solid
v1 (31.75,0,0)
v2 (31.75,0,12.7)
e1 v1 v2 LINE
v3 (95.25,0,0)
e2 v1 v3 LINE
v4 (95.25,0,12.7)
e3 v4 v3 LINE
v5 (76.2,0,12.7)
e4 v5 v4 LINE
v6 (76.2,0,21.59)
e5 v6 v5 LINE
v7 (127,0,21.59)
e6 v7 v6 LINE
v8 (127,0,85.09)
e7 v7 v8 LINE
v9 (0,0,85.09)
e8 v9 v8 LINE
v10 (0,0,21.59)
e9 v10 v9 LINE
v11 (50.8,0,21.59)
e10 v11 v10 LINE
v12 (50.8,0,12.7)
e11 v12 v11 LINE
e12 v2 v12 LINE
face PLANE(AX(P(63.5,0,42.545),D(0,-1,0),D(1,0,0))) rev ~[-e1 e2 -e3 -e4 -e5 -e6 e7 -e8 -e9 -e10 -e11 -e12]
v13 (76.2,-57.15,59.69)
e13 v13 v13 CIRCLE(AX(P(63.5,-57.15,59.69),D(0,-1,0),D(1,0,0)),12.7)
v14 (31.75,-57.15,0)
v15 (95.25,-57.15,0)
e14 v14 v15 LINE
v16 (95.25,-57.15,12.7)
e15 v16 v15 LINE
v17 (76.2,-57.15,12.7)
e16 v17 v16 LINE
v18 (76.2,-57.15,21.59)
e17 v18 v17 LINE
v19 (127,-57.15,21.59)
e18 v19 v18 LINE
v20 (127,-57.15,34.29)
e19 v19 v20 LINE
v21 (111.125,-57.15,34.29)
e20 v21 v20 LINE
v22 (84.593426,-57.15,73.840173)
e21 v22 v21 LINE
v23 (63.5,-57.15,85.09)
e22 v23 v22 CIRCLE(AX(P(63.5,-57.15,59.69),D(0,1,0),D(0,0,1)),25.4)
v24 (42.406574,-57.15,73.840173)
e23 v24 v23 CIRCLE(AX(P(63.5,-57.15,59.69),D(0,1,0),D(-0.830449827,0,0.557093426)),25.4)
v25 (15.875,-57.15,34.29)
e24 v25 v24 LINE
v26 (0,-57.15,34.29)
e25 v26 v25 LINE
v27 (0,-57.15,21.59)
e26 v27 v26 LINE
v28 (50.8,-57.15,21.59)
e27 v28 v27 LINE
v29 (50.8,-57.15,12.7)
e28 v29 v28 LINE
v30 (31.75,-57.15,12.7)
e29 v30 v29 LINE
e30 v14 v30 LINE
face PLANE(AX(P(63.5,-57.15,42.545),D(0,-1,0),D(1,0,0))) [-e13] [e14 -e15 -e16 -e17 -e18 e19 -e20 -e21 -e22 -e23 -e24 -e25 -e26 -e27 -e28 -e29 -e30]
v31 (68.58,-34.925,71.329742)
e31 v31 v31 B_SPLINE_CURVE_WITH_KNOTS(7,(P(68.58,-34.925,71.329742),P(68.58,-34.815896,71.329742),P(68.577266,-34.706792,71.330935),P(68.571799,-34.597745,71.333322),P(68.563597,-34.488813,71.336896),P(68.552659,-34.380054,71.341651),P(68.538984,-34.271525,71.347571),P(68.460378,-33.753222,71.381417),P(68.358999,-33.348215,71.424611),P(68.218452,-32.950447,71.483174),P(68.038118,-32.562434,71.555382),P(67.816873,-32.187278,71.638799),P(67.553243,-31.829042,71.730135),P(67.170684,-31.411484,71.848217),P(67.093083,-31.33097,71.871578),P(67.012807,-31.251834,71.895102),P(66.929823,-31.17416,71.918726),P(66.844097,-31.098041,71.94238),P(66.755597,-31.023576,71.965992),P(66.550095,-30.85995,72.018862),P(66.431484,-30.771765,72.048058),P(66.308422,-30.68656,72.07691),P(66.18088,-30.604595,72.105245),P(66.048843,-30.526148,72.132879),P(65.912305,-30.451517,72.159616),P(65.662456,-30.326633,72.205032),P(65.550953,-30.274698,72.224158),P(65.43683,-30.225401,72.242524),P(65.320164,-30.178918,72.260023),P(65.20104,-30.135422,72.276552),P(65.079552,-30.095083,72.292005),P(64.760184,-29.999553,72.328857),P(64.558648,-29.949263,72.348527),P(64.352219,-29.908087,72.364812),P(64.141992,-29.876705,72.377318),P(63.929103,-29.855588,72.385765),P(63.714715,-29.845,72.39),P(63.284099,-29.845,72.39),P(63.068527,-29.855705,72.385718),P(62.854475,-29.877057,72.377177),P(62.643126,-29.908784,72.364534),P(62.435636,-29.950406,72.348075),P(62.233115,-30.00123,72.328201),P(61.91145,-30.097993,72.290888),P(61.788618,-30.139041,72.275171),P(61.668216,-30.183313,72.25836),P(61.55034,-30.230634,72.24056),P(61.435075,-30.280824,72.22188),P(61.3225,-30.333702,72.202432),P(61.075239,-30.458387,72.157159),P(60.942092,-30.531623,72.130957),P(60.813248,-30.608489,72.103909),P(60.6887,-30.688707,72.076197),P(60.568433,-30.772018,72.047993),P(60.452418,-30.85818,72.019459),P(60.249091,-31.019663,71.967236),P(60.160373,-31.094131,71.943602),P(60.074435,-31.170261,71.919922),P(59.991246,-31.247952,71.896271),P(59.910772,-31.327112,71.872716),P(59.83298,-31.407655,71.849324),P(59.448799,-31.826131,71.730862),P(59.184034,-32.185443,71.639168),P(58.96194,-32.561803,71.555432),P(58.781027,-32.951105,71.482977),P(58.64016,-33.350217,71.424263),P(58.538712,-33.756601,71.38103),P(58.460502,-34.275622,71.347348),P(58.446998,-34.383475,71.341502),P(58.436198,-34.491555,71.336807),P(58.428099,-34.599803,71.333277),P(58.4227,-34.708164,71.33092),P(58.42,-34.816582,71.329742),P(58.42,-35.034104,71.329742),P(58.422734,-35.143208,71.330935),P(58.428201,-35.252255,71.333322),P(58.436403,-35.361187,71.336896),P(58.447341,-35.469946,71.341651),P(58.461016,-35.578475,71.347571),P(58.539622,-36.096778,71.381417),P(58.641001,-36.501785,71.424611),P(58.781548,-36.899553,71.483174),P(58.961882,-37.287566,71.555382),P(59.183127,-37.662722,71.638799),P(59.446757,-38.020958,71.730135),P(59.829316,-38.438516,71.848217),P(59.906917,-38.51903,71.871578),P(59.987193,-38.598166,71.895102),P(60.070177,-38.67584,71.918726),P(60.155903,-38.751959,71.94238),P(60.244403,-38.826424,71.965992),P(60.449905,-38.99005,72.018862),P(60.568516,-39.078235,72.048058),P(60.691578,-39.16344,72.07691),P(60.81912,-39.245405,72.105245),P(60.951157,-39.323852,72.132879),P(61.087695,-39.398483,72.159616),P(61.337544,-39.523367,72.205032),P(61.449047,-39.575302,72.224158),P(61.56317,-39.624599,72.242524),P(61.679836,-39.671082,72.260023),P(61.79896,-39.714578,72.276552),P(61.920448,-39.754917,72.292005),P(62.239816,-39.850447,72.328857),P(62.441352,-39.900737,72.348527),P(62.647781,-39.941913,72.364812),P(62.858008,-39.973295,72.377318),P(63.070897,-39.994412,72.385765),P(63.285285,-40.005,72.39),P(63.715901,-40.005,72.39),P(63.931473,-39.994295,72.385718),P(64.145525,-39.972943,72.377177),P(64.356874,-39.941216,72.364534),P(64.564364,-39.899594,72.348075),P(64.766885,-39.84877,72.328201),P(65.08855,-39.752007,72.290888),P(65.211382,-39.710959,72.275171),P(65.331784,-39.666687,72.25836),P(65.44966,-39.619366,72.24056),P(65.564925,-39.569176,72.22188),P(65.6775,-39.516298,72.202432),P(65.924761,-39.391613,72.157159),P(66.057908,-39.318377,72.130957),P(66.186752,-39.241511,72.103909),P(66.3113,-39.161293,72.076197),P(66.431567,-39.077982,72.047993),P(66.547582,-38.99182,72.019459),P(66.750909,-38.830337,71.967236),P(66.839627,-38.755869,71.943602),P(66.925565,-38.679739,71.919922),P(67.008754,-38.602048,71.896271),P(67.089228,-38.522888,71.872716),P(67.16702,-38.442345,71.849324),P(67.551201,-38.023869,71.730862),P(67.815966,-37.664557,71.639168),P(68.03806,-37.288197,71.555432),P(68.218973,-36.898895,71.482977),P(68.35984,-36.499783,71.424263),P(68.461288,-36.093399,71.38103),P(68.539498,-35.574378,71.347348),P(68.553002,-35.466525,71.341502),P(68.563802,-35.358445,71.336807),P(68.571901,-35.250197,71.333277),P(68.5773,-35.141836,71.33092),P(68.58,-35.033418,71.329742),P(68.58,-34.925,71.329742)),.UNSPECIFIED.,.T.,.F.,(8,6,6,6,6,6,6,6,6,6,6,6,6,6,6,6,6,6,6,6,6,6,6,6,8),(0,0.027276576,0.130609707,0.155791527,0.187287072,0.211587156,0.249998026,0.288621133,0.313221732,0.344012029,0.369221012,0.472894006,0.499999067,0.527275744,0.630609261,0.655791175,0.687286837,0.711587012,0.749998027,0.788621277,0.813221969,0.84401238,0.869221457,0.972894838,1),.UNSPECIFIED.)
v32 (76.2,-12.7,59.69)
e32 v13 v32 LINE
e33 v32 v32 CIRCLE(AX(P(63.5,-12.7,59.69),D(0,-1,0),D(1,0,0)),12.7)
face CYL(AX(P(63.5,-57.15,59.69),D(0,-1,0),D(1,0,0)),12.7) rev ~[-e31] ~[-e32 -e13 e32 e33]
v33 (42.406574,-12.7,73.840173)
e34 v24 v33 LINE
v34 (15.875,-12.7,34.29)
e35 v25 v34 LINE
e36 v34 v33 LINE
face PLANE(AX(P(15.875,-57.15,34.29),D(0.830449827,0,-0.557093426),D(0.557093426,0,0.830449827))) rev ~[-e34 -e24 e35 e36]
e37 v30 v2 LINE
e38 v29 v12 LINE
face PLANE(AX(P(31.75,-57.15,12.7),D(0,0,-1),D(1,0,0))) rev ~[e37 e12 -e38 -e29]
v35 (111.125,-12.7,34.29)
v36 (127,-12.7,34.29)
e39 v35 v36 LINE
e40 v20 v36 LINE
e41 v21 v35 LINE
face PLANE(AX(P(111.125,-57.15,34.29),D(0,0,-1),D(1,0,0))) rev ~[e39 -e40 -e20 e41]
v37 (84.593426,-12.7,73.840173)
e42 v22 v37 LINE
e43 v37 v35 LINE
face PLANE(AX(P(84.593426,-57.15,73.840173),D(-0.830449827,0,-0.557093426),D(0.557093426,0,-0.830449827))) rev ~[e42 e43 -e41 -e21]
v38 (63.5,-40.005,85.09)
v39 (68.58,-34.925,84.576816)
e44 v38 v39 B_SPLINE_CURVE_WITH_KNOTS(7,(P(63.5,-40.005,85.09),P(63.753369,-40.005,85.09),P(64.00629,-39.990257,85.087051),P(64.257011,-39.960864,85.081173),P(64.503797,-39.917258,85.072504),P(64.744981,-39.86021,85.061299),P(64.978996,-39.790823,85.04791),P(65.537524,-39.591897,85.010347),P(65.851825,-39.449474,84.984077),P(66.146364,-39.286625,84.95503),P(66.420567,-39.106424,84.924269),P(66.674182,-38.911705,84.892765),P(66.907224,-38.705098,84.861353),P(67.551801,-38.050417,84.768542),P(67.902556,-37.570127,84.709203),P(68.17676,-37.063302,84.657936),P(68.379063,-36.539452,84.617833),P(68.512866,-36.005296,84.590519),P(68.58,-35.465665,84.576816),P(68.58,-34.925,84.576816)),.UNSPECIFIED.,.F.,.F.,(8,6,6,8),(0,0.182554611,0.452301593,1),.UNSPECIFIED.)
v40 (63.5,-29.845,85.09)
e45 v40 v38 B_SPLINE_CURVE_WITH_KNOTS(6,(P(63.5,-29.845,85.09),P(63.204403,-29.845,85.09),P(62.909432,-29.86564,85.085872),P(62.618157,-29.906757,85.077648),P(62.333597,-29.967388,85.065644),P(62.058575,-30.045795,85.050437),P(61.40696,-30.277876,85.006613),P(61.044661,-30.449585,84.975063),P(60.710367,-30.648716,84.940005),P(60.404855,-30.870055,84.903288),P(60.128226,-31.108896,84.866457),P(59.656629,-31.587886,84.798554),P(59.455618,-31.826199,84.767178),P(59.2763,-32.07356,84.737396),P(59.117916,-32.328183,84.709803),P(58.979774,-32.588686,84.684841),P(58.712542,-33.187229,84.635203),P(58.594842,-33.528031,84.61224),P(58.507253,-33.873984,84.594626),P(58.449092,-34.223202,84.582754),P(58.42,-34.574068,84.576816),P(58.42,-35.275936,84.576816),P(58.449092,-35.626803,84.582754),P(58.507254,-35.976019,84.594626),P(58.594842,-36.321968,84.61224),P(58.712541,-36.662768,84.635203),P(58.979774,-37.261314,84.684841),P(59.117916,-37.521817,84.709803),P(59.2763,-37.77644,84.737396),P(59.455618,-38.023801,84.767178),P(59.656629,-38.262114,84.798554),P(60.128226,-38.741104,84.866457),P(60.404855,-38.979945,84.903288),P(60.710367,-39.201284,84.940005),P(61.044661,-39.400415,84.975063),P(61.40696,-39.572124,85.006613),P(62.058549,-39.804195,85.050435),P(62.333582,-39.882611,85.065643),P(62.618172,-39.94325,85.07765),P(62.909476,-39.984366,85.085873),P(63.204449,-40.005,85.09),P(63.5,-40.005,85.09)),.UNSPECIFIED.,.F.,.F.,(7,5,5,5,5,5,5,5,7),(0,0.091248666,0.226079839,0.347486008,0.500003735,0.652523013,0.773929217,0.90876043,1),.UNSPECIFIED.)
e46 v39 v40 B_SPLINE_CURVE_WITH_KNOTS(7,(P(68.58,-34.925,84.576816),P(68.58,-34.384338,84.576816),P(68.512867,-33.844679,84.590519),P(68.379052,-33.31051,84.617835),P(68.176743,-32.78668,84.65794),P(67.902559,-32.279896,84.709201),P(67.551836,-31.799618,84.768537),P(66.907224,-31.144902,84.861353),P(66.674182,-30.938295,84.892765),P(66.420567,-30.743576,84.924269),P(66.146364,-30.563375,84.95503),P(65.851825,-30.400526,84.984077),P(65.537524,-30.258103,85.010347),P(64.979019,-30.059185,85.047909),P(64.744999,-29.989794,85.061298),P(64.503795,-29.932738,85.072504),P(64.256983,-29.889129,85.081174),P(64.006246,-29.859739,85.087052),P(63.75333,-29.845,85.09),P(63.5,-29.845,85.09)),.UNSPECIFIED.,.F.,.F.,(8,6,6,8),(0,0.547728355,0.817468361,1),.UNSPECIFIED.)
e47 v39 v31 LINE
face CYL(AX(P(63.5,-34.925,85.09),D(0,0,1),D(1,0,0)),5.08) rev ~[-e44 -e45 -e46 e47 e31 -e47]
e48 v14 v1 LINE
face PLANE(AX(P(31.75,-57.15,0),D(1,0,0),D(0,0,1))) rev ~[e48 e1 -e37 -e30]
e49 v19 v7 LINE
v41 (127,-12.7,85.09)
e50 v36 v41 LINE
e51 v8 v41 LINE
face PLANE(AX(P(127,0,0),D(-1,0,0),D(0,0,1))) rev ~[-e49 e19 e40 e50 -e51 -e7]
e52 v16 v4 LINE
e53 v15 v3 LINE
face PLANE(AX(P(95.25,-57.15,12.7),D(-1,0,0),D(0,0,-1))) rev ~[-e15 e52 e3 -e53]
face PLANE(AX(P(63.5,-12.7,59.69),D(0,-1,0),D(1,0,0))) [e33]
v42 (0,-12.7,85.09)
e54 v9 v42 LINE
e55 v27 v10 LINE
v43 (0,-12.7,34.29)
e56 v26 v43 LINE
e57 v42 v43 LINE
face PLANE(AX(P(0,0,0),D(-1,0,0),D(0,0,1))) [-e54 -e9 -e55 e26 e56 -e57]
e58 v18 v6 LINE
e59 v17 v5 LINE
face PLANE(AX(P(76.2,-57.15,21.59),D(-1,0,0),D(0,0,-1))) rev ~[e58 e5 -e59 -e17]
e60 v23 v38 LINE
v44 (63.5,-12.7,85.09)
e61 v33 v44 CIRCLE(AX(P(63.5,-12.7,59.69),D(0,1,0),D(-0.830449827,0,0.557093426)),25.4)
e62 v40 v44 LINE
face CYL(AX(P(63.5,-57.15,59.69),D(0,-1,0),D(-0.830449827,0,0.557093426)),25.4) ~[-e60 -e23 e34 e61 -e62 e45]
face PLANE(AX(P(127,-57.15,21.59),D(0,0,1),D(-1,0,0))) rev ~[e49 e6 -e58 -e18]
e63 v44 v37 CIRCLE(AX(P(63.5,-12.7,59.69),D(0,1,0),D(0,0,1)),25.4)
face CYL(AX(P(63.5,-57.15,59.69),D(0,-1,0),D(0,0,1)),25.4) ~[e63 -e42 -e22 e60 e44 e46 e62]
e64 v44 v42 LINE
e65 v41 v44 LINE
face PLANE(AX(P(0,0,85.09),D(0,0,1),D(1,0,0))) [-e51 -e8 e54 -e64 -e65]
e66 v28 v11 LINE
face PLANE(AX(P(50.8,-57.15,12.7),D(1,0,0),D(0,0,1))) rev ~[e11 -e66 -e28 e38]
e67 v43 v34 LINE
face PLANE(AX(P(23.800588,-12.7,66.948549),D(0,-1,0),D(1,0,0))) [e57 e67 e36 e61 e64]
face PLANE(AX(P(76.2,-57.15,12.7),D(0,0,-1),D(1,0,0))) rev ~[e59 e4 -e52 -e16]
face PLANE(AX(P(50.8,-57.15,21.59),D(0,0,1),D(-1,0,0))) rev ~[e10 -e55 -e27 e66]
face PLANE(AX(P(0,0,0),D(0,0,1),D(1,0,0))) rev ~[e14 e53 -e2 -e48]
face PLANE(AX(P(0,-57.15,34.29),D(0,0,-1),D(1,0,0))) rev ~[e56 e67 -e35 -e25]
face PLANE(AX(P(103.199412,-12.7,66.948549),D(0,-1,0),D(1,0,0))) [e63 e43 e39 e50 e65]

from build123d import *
from build123d import SkipClean  # not in build123d's __all__

# Parameters (mm, degrees)
F0_W     = 127
F0_H     = 85.09
F1_DEPTH = 57.15
F3_DEPTH = 57.151
F4_DEPTH = 44.45
F5_R     = 12.7
F6_DEPTH = 44.45
F7_R     = 5.08
F8_DEPTH = 13.7612578348


with BuildPart() as f1:
    # F0 (on Front) → F1 (new body)
    with BuildSketch(Plane.XZ):
        with Locations((63.5, 42.545)):
            Rectangle(F0_W, F0_H)
    extrude(amount=F1_DEPTH)

    # F2 (on face) → F3 (cut, through all)
    with BuildSketch(Plane.XZ.offset(57.15)):
        Polygon((0, 0), (31.75, 0), (31.75, 12.7), (50.8, 12.7), (50.8, 21.59), (0, 21.59), align=None)
        Polygon((95.25, 12.7), (95.25, 0), (127, 0), (127, 21.59), (76.2, 21.59), (76.2, 12.7), align=None)
    extrude(amount=-F3_DEPTH, mode=Mode.SUBTRACT)

    # F2 (on face) → F4 (cut)
    with BuildSketch(Plane.XZ.offset(57.15)):
        with BuildLine():
            Line((0, 85.09), (0, 34.29))
            Line((0, 34.29), (15.875, 34.29))
            Line((15.875, 34.29), (42.4065743945, 73.8401730104))
            ThreePointArc((42.4065743945, 73.8401730104), (51.5470588235, 82.1017647059), (63.5, 85.09))
            Line((63.5, 85.09), (0, 85.09))
        make_face()
        with BuildLine():
            Line((111.125, 34.29), (127, 34.29))
            Line((127, 34.29), (127, 85.09))
            Line((127, 85.09), (63.5, 85.09))
            ThreePointArc((63.5, 85.09), (75.4529411765, 82.1017647059), (84.5934256055, 73.8401730104))
            Line((84.5934256055, 73.8401730104), (111.125, 34.29))
        make_face()
    extrude(amount=-F4_DEPTH, mode=Mode.SUBTRACT)

    # F5 (on face) → F6 (cut)
    with BuildSketch(Plane.XZ.offset(57.15)):
        with Locations((63.5, 59.69)):
            Circle(F5_R)
    extrude(amount=-F6_DEPTH, mode=Mode.SUBTRACT)

    # F7 (on face) → F8 (cut, through all)
    with BuildSketch(Plane.XY.offset(85.09)):
        with Locations((63.5, -34.925)):
            Circle(F7_R)
    with SkipClean():  # cleaning this boolean's faces spoils the solid; the shape is the same uncleaned
        extrude(amount=-F8_DEPTH, mode=Mode.SUBTRACT)


solid = f1.part
